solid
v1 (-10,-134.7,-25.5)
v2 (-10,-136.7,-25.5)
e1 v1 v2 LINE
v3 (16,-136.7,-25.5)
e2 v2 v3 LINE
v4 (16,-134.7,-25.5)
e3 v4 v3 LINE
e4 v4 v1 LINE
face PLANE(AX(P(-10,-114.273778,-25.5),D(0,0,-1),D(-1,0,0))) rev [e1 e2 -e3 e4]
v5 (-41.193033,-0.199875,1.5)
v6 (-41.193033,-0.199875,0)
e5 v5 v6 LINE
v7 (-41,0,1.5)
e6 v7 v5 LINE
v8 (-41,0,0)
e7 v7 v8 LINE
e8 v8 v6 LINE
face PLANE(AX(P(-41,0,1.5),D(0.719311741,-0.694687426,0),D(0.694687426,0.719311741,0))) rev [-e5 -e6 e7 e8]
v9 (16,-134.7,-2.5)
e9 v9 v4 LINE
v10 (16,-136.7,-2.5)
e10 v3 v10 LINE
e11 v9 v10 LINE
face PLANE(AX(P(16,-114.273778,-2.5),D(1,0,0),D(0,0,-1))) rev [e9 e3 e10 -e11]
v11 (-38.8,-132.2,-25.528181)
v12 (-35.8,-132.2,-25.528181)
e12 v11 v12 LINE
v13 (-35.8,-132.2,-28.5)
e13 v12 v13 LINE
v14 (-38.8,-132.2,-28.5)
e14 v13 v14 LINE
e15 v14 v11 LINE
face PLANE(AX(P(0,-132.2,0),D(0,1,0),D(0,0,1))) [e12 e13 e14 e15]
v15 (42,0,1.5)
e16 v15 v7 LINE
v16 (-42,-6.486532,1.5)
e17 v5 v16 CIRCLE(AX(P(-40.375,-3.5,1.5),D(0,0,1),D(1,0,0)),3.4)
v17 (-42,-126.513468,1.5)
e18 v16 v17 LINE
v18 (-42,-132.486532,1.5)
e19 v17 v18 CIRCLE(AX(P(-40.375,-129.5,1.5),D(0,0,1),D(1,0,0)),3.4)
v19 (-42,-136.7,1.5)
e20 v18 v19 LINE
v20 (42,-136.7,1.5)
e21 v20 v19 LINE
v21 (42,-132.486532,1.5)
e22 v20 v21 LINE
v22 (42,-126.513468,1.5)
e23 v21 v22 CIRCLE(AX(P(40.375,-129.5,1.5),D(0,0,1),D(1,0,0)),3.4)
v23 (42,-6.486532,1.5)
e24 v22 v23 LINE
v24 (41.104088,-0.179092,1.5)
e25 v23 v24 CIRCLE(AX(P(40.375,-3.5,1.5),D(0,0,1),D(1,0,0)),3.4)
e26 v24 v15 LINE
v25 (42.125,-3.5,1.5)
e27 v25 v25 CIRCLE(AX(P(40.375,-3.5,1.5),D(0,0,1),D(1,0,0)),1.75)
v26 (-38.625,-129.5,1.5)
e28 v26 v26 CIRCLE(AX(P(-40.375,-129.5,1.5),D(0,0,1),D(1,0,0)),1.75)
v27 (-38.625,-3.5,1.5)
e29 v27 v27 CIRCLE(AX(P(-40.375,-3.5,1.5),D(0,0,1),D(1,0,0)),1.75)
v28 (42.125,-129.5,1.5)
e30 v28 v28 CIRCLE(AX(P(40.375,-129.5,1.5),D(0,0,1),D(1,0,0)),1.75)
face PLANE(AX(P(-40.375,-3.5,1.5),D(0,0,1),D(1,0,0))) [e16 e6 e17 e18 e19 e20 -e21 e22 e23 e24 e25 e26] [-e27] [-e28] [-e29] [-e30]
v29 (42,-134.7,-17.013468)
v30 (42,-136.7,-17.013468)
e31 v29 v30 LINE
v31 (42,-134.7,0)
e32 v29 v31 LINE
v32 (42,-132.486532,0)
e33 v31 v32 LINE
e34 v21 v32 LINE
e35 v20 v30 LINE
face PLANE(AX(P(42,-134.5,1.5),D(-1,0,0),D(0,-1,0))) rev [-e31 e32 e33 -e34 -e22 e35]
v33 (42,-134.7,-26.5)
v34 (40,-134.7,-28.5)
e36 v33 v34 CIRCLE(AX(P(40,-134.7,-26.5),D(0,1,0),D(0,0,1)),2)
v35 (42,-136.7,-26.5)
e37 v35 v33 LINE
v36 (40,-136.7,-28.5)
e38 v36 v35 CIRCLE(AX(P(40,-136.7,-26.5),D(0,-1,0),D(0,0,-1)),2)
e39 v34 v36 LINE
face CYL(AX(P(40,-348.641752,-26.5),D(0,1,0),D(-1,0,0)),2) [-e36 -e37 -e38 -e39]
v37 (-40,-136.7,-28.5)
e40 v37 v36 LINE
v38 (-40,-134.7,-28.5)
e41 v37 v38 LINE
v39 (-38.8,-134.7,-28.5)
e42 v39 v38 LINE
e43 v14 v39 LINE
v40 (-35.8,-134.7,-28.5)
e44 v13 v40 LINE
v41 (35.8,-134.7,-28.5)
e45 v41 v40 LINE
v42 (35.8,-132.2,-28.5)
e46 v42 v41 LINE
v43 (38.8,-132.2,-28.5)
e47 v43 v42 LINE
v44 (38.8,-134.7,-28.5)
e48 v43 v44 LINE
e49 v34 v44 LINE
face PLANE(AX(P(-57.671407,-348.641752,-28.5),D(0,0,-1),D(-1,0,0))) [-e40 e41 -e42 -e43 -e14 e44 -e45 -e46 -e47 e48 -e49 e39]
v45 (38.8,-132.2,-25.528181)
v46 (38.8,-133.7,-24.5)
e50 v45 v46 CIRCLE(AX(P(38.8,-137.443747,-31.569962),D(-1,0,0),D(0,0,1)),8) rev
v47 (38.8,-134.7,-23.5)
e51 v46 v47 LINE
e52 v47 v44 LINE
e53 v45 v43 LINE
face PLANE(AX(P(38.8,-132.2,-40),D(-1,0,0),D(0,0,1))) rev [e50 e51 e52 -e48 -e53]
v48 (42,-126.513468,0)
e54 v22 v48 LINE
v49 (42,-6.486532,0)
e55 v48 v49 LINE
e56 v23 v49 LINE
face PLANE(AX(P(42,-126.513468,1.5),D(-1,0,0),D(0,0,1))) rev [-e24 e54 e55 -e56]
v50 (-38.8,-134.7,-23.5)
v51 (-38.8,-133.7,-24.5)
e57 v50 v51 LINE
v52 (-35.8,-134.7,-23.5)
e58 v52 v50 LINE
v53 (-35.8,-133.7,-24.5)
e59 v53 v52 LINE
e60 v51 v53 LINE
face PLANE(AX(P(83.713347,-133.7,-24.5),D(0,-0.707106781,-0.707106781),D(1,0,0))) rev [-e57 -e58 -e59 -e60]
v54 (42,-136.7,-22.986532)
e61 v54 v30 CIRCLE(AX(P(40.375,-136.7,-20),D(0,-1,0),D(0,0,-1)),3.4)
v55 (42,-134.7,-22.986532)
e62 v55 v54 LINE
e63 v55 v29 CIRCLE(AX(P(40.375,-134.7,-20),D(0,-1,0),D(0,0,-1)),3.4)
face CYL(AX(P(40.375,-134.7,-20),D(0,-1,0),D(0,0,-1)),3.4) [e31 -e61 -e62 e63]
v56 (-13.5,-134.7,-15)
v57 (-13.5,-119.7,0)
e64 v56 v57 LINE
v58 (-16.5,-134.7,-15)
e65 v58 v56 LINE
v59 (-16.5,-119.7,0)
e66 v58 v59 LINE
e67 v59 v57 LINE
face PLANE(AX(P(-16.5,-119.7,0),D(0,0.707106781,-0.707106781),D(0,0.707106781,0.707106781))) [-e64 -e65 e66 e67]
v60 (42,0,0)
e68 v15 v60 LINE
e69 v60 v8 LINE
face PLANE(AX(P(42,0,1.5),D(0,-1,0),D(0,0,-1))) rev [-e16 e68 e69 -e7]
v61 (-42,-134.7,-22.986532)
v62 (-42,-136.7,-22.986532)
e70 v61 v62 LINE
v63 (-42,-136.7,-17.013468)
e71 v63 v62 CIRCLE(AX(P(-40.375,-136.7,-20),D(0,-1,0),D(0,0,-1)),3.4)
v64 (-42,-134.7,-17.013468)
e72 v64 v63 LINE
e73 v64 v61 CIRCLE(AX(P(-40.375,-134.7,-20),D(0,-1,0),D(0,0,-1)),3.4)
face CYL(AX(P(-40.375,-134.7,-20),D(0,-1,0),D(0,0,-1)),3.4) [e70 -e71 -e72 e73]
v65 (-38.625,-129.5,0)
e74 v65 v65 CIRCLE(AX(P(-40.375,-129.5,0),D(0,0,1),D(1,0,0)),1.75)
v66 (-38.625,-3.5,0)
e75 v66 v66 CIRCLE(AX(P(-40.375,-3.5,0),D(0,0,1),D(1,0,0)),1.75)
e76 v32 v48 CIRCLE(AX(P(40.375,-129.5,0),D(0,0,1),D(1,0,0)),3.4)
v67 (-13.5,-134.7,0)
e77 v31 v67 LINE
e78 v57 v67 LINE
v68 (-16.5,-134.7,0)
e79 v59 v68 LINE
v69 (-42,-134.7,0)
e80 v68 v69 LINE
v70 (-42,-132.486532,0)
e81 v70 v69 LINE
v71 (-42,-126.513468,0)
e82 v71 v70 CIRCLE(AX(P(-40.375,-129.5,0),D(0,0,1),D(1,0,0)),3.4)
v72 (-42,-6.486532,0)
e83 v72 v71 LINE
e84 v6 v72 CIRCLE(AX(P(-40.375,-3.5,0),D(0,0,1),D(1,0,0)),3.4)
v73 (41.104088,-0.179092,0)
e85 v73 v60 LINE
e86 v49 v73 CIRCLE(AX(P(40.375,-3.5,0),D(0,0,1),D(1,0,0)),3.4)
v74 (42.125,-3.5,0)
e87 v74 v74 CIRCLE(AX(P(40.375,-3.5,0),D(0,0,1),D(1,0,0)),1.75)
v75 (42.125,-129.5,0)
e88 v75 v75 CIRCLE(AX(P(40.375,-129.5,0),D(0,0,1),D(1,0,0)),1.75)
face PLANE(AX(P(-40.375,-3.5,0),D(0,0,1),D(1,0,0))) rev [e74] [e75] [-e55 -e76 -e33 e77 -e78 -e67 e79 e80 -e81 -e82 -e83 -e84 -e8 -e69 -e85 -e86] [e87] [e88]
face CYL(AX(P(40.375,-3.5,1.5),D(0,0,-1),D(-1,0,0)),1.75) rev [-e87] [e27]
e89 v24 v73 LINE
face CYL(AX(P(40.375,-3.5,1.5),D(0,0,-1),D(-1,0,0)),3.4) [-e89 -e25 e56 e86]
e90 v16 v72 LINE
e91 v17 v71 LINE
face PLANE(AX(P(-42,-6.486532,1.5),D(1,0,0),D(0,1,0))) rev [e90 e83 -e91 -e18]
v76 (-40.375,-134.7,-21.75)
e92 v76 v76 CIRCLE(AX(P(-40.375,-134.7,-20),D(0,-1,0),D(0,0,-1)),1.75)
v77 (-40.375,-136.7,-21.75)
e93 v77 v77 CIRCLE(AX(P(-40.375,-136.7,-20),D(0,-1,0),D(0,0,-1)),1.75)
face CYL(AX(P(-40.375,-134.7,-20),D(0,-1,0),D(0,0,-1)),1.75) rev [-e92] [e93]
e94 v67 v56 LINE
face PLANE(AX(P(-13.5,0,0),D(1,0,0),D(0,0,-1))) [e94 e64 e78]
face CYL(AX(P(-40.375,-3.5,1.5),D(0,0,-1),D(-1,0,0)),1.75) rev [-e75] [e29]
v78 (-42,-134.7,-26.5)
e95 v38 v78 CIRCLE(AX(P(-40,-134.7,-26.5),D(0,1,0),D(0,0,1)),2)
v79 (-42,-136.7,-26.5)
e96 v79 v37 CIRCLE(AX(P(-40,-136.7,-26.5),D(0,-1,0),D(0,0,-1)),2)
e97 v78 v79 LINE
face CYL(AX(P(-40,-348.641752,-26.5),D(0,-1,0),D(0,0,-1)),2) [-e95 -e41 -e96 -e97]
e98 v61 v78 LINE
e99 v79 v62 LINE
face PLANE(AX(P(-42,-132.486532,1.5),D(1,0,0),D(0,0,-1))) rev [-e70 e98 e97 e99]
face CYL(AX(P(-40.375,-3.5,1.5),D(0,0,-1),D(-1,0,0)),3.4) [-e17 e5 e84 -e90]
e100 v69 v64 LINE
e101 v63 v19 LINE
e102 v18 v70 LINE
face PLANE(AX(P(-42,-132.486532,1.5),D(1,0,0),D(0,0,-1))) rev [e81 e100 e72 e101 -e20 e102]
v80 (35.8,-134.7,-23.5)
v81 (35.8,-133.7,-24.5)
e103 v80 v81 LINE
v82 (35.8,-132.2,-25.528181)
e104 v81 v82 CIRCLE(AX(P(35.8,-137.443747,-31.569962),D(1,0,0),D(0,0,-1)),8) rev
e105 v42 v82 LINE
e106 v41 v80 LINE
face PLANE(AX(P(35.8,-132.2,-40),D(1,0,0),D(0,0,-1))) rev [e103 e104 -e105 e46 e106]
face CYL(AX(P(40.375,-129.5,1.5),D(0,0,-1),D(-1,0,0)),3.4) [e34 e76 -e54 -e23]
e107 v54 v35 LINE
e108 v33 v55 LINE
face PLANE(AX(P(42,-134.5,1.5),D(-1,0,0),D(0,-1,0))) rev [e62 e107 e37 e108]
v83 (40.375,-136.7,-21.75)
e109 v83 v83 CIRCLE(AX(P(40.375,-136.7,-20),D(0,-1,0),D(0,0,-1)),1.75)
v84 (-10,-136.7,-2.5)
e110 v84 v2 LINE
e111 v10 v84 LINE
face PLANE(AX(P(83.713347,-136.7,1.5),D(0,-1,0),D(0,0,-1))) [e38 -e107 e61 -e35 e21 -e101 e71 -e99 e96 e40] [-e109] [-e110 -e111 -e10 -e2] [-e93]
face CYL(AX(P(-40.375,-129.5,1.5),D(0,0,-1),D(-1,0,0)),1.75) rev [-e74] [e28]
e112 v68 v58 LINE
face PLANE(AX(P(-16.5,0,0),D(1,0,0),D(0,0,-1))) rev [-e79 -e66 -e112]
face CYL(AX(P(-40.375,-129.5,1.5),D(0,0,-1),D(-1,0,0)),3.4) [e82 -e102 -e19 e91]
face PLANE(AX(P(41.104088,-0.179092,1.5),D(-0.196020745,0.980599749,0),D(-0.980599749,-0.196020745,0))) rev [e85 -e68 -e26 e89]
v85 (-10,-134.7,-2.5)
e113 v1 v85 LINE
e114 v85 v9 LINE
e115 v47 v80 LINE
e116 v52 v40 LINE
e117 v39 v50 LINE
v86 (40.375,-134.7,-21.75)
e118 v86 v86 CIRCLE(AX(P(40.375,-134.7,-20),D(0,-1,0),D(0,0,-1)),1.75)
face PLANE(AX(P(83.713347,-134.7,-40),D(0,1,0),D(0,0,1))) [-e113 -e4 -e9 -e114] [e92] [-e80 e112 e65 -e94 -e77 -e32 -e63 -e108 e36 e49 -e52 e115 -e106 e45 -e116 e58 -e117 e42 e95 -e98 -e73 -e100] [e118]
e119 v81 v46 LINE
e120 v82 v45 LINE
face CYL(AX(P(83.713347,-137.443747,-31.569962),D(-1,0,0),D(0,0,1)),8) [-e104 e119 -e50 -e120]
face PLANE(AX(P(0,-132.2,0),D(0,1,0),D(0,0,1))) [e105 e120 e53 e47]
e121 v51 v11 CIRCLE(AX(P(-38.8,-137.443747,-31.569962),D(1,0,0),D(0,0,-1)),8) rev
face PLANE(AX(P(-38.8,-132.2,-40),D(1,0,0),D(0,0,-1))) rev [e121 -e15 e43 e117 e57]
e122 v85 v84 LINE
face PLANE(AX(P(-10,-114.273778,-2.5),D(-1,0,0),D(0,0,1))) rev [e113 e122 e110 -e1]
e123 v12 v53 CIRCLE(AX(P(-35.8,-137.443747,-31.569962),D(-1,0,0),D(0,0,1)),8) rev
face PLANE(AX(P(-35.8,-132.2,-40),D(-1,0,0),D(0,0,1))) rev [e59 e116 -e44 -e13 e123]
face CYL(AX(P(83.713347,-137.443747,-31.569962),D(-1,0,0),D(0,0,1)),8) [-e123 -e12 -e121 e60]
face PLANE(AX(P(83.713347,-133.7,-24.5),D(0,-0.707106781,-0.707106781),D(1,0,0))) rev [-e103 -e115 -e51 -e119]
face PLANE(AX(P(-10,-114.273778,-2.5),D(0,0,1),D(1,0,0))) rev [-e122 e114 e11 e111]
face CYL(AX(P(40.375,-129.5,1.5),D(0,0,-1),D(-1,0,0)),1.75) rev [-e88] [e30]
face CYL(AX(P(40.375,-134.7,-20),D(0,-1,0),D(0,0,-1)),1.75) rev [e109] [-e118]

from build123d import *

# Parameters (mm, degrees)
SKETCH1_R                = 1.75
BOSS_EXTRUDE1_DEPTH      = 1.5
BOSS_EXTRUDE2_DEPTH      = 84
BOSS_EXTRUDE3_DEPTH      = 1.5
BOSS_EXTRUDE3_DEPTH_BACK = 1.5
BOSS_EXTRUDE4_DEPTH      = 2
SKETCH5_R                = 1.75
CUT_EXTRUDE1_DEPTH       = 2
CUT_EXTRUDE2_DEPTH       = 150.007183132
CUT_EXTRUDE2_DEPTH_BACK  = 150.007183132
SKETCH6_W                = 84
SKETCH6_H                = 11.5
BOSS_EXTRUDE6_START      = -2
SKETCH7_W                = 3
SKETCH7_H                = 4
BOSS_EXTRUDE6_DEPTH      = 2.5
FILLET1_R                = 2
CHAMFER1_SIZE            = 1
FILLET2_R                = 8
SKETCH8_W                = 26
SKETCH8_H                = 23
CUT_EXTRUDE3_DEPTH       = 22.4262221


with BuildPart() as part:
    # Sketch1 → Boss-Extrude1 (new body)
    with BuildSketch(Plane.XY):
        with BuildLine():
            Line((-38.75, -134.5), (38.75, -134.5))
            Line((38.75, -134.5), (42, -134.5))
            Line((42, -134.5), (42, -132.48653227))
            ThreePointArc((42, -132.48653227), (43.775, -129.5), (42, -126.51346773))
            Line((42, -126.51346773), (42, -6.48653227))
            ThreePointArc((42, -6.48653227), (43.741212037, -3.021861398), (41.104087703, -0.179091823))
            Line((41.104087703, -0.179091823), (42, 0))
            Line((42, 0), (-41, 0))
            Line((-41, 0), (-41.193033114, -0.199875483))
            ThreePointArc((-41.193033114, -0.199875483), (-43.747330957, -3.067121364), (-42, -6.48653227))
            Line((-42, -6.48653227), (-42, -126.51346773))
            ThreePointArc((-42, -126.51346773), (-43.775, -129.5), (-42, -132.48653227))
            Line((-42, -132.48653227), (-42, -134.5))
            Line((-42, -134.5), (-38.75, -134.5))
        make_face()
        with Locations((-40.375, -129.5)):
            Circle(SKETCH1_R, mode=Mode.SUBTRACT)
        with Locations((40.375, -129.5)):
            Circle(SKETCH1_R, mode=Mode.SUBTRACT)
        with Locations((40.375, -3.5)):
            Circle(SKETCH1_R, mode=Mode.SUBTRACT)
        with Locations((-40.375, -3.5)):
            Circle(SKETCH1_R, mode=Mode.SUBTRACT)
    extrude(amount=BOSS_EXTRUDE1_DEPTH)

    # Sketch2 → Boss-Extrude2 (add)
    with BuildSketch(Plane.ZY.offset(42)):
        Polygon((1.5, -134.5), (1.5, -136.7), (-40, -136.7), (-40, -134.7), (0, -134.7), (0, -134.5), (0, -132.48653227), (1.5, -132.48653227), align=None)
    extrude(amount=-BOSS_EXTRUDE2_DEPTH)

    # Sketch3 → Boss-Extrude3 (add, two sides: drawn at the far end of the back side and taken through both)
    with BuildSketch(Plane(origin=(-15, 0, 0), x_dir=(0, 0, -1), z_dir=(1, 0, 0)).offset(-BOSS_EXTRUDE3_DEPTH_BACK)):
        Polygon((0, -119.7), (15, -134.7), (0, -134.7), align=None)
    extrude(amount=BOSS_EXTRUDE3_DEPTH + BOSS_EXTRUDE3_DEPTH_BACK)

    # Sketch4 → Boss-Extrude4 (add)
    with BuildSketch(Plane.XZ.offset(136.7)):
        with BuildLine():
            Line((-42, -17.01346773), (-42, -22.98653227))
            ThreePointArc((-42, -22.98653227), (-43.775, -20), (-42, -17.01346773))
        make_face()
        with BuildLine():
            Line((42, -17.01346773), (42, -22.98653227))
            ThreePointArc((42, -22.98653227), (43.775, -20), (42, -17.01346773))
        make_face()
    extrude(amount=-BOSS_EXTRUDE4_DEPTH)

    # Sketch5 → Cut-Extrude1 (cut)
    with BuildSketch(Plane.XZ.offset(136.7)):
        with Locations(Location((40.375, -20, 0), (0, 0, 270))):
            Circle(SKETCH5_R)
        with Locations(Location((-40.375, -20, 0), (0, 0, 270))):
            Circle(SKETCH5_R)
    extrude(amount=-CUT_EXTRUDE1_DEPTH, mode=Mode.SUBTRACT)

    # Sketch6 → Cut-Extrude2 (cut, two sides: drawn at the far end of the back side and taken through both)
    with BuildSketch(Plane.XZ.offset(136.7).offset(-CUT_EXTRUDE2_DEPTH_BACK)):
        with Locations((0, -34.25)):
            Rectangle(SKETCH6_W, SKETCH6_H)
    extrude(amount=CUT_EXTRUDE2_DEPTH + CUT_EXTRUDE2_DEPTH_BACK, mode=Mode.SUBTRACT)

    # Sketch7 → Boss-Extrude6 (add)
    with BuildSketch(Plane.XZ.offset(136.7).offset(BOSS_EXTRUDE6_START)):
        with Locations((-37.3, -26.5)):
            Rectangle(SKETCH7_W, SKETCH7_H)
        with Locations((37.3, -26.5)):
            Rectangle(SKETCH7_W, SKETCH7_H)
    extrude(amount=-BOSS_EXTRUDE6_DEPTH)

    # Fillet1
    fillet1_edges = [part.edges().sort_by_distance(p)[0] for p in [
        (42, -135.7, -28.5),
        (-42, -135.7, -28.5),
    ]]
    fillet(fillet1_edges, radius=FILLET1_R)

    # Chamfer1
    chamfer1_edges = [part.edges().sort_by_distance(p)[0] for p in [
        (-37.3, -134.7, -24.5),
        (-37.3, -132.2, -24.5),
        (37.3, -134.7, -24.5),
        (37.3, -132.2, -24.5),
    ]]
    chamfer(chamfer1_edges, length=CHAMFER1_SIZE)

    # Fillet2
    # the kernel refuses this fillet: 8 mm, written as the material it takes off along each edge
    with BuildSketch(Plane(origin=(-30.803909917, -133.2, -24.5), x_dir=(0, -1.0, -1.118394266079786e-11), z_dir=(-1, 0, 0))) as fillet2_piece_1:
        with BuildLine():
            CenterArc((4.243746579, -7.06996192), FILLET2_R, 117.902496562, 17.097503438)
            Line((-1.413107671, -1.413107671), (0, 0))
            Line((0, 0), (0.5, 0))
        make_face()
    extrude(amount=12.992180166, mode=Mode.SUBTRACT)
    with BuildSketch(Plane(origin=(30.803909917, -133.2, -24.5), x_dir=(0, 0.7071067811865501, -0.7071067811865448), z_dir=(1, 0, 0))) as fillet2_piece_2:
        with BuildLine():
            CenterArc((1.998436033, -8), FILLET2_R, 90, 17.097503438)
            Line((-0.353553391, -0.353553391), (0, 0))
            Line((0, 0), (1.998436033, 0))
        make_face()
    extrude(amount=12.992180166, mode=Mode.SUBTRACT)

    # Sketch8 → Cut-Extrude3 (cut)
    with BuildSketch(Plane.XZ.offset(136.7)):
        with Locations((3, -14)):
            Rectangle(SKETCH8_W, SKETCH8_H)
    extrude(amount=-CUT_EXTRUDE3_DEPTH, mode=Mode.SUBTRACT)


solid = part.part
